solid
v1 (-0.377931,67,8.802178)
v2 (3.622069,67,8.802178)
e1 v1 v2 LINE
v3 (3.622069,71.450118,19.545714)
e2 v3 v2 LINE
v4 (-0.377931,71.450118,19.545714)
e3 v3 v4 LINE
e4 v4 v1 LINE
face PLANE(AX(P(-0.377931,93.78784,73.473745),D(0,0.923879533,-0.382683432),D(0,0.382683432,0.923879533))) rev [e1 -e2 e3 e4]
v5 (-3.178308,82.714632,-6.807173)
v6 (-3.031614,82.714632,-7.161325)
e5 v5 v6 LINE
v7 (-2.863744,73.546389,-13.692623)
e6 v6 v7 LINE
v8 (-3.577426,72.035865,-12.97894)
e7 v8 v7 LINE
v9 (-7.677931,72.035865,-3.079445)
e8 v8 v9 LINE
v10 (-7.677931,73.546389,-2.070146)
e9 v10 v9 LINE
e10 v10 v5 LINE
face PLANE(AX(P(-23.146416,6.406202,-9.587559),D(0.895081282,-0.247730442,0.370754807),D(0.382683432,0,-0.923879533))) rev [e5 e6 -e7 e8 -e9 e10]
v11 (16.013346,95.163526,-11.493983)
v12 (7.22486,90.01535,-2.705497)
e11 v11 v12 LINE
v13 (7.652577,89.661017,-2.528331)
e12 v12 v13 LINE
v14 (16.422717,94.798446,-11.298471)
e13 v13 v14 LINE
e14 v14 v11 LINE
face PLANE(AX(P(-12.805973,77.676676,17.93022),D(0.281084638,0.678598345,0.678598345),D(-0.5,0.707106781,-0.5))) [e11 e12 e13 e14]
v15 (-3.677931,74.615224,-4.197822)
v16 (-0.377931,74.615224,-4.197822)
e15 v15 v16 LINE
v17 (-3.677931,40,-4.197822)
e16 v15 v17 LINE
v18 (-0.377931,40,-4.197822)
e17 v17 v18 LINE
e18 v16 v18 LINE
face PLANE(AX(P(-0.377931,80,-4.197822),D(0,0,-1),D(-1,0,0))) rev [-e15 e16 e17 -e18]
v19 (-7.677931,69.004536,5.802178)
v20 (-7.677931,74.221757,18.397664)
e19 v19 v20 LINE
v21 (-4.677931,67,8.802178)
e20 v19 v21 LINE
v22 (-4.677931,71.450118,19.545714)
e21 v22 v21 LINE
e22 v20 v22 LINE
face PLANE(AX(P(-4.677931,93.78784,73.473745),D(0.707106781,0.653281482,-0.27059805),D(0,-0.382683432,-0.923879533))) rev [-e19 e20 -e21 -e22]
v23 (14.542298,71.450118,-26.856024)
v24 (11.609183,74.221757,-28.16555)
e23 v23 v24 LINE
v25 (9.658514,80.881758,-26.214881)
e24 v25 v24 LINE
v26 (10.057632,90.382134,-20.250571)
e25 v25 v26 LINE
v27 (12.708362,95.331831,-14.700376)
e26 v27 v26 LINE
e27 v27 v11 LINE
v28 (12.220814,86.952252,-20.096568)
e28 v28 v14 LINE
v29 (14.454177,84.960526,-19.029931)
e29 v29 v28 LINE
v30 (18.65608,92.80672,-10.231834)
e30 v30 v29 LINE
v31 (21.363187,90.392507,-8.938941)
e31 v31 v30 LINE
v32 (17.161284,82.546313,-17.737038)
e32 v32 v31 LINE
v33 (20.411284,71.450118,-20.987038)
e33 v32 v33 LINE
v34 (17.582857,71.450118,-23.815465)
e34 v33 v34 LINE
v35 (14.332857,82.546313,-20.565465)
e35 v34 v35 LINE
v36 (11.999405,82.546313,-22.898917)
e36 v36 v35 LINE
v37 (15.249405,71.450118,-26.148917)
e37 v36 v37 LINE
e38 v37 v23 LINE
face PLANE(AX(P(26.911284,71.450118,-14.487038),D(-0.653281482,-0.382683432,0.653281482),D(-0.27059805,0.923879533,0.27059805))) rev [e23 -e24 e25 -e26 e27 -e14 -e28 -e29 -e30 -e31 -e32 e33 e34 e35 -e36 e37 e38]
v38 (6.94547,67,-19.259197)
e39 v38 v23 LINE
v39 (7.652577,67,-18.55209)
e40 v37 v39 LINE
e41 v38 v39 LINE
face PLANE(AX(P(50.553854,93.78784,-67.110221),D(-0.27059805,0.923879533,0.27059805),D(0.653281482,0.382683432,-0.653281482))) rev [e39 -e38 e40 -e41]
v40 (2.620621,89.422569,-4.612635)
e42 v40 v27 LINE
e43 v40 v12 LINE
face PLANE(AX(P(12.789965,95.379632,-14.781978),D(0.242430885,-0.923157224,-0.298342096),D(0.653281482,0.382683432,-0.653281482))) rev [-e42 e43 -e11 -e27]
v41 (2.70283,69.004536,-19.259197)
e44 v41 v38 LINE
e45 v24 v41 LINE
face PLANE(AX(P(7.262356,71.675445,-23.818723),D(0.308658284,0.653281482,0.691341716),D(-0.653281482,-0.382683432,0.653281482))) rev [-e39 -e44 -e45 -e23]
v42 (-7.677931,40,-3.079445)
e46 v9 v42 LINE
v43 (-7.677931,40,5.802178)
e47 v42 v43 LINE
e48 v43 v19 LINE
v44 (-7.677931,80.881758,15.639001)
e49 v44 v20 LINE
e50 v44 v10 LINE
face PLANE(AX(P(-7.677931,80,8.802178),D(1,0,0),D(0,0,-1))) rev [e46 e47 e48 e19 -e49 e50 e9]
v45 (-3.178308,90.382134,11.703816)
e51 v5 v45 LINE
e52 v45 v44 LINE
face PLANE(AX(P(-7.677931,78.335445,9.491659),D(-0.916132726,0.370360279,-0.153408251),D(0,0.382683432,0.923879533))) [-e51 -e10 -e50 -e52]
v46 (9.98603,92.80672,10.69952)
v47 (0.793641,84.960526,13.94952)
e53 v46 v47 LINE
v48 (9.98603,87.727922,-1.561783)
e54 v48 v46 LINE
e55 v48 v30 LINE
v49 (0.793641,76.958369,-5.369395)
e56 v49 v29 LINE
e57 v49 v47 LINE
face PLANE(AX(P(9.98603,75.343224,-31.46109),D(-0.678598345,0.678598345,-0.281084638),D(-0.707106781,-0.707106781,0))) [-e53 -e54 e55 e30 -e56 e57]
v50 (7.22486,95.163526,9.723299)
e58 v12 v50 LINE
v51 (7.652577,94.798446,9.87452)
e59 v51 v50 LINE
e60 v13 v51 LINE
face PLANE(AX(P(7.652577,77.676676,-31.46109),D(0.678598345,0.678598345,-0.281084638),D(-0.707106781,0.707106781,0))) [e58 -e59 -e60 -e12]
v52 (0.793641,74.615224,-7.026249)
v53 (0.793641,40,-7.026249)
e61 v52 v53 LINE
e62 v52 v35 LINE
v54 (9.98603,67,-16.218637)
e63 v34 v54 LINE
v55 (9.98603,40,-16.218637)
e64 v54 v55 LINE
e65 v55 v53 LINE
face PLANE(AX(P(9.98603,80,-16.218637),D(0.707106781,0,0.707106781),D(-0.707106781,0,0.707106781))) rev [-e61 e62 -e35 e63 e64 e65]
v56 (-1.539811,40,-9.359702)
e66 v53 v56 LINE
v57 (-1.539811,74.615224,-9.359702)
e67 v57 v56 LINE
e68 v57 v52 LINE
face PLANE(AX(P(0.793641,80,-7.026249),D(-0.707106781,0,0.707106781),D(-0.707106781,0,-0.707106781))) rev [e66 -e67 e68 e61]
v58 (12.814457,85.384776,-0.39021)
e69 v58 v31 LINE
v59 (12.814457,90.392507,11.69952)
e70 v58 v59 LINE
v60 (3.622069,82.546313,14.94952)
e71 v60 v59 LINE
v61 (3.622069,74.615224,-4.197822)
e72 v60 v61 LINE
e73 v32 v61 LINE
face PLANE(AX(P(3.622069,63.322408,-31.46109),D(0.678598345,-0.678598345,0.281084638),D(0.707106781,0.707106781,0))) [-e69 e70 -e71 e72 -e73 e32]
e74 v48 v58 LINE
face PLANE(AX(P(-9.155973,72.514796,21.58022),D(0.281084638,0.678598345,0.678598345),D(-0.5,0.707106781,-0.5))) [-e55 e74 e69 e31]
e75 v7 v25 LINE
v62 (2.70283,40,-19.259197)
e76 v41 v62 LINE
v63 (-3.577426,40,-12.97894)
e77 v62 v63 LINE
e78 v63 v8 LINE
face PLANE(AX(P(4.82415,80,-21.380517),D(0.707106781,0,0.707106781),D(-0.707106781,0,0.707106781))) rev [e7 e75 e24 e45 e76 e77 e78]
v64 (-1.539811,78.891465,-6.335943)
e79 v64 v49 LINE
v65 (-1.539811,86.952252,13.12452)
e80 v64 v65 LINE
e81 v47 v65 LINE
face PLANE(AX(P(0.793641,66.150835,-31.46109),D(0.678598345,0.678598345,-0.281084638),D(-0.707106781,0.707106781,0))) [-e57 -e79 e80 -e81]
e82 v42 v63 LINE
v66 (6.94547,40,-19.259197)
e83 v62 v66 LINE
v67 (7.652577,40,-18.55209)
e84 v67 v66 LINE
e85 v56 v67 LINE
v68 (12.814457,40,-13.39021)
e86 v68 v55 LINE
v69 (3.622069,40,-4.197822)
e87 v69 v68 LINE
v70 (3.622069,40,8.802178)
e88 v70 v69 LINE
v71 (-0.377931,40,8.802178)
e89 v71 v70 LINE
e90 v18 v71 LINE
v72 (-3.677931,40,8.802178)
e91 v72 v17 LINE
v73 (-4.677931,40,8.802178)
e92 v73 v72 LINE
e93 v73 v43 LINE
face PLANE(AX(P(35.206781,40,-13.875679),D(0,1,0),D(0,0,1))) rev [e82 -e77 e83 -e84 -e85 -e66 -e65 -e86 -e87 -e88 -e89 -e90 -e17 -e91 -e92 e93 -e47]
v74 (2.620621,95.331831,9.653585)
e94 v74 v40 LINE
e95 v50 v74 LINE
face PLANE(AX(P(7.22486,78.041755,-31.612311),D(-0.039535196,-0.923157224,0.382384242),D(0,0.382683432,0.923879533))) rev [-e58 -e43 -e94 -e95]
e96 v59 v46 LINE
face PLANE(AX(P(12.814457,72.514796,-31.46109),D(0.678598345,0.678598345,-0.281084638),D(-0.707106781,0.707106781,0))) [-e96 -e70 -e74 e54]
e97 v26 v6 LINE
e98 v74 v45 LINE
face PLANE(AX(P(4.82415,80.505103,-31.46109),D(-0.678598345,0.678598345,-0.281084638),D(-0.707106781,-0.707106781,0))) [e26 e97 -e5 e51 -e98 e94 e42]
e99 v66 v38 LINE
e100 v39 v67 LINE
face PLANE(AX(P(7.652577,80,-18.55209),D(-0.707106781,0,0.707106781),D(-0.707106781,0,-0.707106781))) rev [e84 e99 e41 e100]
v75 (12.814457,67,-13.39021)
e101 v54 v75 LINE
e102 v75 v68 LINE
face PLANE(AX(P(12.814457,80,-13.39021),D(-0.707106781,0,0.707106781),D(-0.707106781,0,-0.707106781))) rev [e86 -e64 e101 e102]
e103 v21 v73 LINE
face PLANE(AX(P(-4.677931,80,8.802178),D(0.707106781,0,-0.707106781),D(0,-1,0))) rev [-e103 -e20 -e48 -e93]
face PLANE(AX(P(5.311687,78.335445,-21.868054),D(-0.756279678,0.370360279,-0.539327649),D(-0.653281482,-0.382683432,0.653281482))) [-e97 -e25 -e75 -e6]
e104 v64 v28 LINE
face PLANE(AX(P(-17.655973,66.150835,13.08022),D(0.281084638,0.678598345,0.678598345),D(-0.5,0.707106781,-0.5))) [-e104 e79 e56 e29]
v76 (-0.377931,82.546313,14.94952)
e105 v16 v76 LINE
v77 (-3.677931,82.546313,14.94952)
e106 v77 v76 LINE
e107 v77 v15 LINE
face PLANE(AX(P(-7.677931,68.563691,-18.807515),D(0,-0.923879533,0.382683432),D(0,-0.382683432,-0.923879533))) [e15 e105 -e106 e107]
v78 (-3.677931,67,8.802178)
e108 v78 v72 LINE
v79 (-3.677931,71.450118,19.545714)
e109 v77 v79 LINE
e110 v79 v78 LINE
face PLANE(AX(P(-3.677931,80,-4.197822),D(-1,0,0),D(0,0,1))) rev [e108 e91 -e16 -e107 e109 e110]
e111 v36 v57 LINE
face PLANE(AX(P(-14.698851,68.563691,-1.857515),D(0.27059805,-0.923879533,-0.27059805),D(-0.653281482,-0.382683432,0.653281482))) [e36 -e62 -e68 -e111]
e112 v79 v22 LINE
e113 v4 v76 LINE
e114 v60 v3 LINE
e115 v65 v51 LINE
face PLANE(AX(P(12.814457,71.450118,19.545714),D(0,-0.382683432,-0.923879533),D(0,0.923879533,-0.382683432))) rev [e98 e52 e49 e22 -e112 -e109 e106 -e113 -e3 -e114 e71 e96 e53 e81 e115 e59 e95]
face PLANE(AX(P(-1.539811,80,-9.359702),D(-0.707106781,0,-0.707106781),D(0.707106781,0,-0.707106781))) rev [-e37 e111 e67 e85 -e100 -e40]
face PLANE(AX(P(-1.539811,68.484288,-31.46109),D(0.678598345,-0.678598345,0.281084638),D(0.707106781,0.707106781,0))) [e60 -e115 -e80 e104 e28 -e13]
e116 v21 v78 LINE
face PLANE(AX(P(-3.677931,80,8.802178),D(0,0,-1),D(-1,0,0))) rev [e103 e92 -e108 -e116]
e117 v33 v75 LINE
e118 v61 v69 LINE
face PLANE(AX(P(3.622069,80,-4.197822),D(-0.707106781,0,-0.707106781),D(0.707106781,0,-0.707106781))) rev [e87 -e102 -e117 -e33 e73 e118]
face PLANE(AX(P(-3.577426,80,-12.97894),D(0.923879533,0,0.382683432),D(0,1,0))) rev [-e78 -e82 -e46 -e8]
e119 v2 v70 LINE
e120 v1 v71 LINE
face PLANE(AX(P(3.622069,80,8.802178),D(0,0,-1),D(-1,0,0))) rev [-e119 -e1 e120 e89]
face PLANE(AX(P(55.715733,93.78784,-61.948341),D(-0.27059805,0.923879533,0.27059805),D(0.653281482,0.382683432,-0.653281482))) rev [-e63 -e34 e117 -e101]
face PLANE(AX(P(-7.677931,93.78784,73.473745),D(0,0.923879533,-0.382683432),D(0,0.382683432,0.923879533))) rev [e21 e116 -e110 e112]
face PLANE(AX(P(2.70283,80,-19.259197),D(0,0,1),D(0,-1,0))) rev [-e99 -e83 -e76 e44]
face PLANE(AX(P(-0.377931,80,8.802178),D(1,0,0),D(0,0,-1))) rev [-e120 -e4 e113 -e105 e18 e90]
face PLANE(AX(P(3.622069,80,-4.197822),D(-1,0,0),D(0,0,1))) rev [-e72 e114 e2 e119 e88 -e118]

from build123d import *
from OCP.BRepFilletAPI import BRepFilletAPI_MakeChamfer

# Parameters (mm, degrees)
BOSS_EXTRUDE1_DEPTH = 80
CUT_EXTRUDE2_DEPTH  = 82.280481137
SKETCH6_W           = 4
SKETCH6_H           = 13
BOSS_EXTRUDE6_DEPTH = 70
BOSS_EXTRUDE7_REACH = 148.366
BOSS_EXTRUDE8_REACH = 152.403
CUT_EXTRUDE3_DEPTH  = 146.557626962
CUT_EXTRUDE4_DEPTH  = 142.8119282
CHAMFER3_START      = -30
CHAMFER3_OUTLINE_W  = 24
CHAMFER3_OUTLINE_H  = 27
CHAMFER3_DEPTH      = 4.140431355
CHAMFER4_START      = -11
CHAMFER4_OUTLINE_W  = 75
CHAMFER4_OUTLINE_H  = 14
CHAMFER4_DEPTH      = 2.728063486
CHAMFER5_START      = -38
CHAMFER5_OUTLINE_W  = 21
CHAMFER5_OUTLINE_H  = 26
CHAMFER5_DEPTH      = 3.409757195
CHAMFER7_SIZE       = 3
CHAMFER7_SIZE2      = 3.268453219
CHAMFER8_START      = -40
CHAMFER8_DEPTH      = 3.210737533
SKETCH20_W          = 40
SKETCH20_H          = 40
CUT_EXTRUDE5_DEPTH  = 103.734976835


with BuildPart() as part:
    # Sketch1 → Boss-Extrude1 (new body)
    with BuildSketch(Plane(origin=(0, 0, 0), x_dir=(1, 0, 0), z_dir=(0, 1, 0))):
        Polygon((3.622068507, 4.197822071), (3.622068507, -8.802177929), (-0.377931493, -8.802177929), (-0.377931493, 4.197822071), (-3.677931493, 4.197822071), (-3.677931493, -8.802177929), (-7.677931493, -8.802177929), (-7.677931493, 8.878435326), align=None)
    extrude(amount=BOSS_EXTRUDE1_DEPTH)

    # Sketch2 → Cut-Extrude2 (cut, through all)
    with BuildSketch(Plane.ZY.offset(7.677931493)):
        Polygon((8.802177929, 80), (-8.878435326, 80), (-8.878435326, 72.676450199), align=None)
    extrude(amount=-CUT_EXTRUDE2_DEPTH, mode=Mode.SUBTRACT)

    # Sketch6 → Boss-Extrude6 (add, along a direction that is not the sketch's normal)
    with BuildSketch(Plane.XY.offset(8.802177929)):
        with Locations((-5.677931493, 73.5)):
            Rectangle(SKETCH6_W, SKETCH6_H)
        with Locations((1.622068507, 73.5)):
            Rectangle(SKETCH6_W, SKETCH6_H)
    extrude(amount=BOSS_EXTRUDE6_DEPTH, dir=(0, 0.3826834323650841, 0.9238795325112892))

    # Boss-Extrude7: up to this plane
    boss_extrude7_end = Plane(origin=(3.622068507, 80, -4.197822071), z_dir=(-0.3826834323650841, 0, 0.9238795325112892))
    # Sketch7 → Boss-Extrude7 (add, up to the surface)
    with BuildSketch(Plane.XY.offset(73.473745205), mode=Mode.PRIVATE) as boss_extrude7_sk1:
        Polygon((-7.677931493, 106.787840266), (3.622068507, 106.787840266), (-7.677931493, 111.46845352), align=None)
    boss_extrude7_tool1 = split(extrude(boss_extrude7_sk1.sketch, amount=BOSS_EXTRUDE7_REACH, dir=(0, -0.382683432365, -0.923879532511), mode=Mode.PRIVATE), bisect_by=boss_extrude7_end, keep=Keep.BOTH, mode=Mode.PRIVATE)
    add(boss_extrude7_tool1.solids().sort_by_distance((-3.911265, 108.348045, 73.473745))[0])

    # Boss-Extrude8: up to this plane
    boss_extrude8_end = Plane(origin=(3.622068507, 80, -4.197822071), z_dir=(-0.3826834323650841, 0, 0.9238795325112892))
    # Sketch16 → Boss-Extrude8 (add, up to the surface)
    with BuildSketch(Plane.XY.offset(73.473745205), mode=Mode.PRIVATE) as boss_extrude8_sk1:
        Polygon((3.622068507, 106.787840266), (12.814456663, 115.980228421), (9.986029538, 118.808655546), (0.793641383, 109.61626739), (-1.539810995, 111.949719768), (7.65257716, 121.142107924), (4.824150035, 123.970535048), (-7.677931493, 111.46845352), align=None)
    boss_extrude8_tool1 = split(extrude(boss_extrude8_sk1.sketch, amount=BOSS_EXTRUDE8_REACH, dir=(0, -0.382683432365, -0.923879532511), mode=Mode.PRIVATE), bisect_by=boss_extrude8_end, keep=Keep.BOTH, mode=Mode.PRIVATE)
    add(boss_extrude8_tool1.solids().sort_by_distance((8.029162, 111.573135, 73.473745))[0])

    # Sketch17 → Cut-Extrude3 (cut, through all)
    with BuildSketch(Plane.ZY.offset(7.677931493)):
        Polygon((73.473745205, 93.787840266), (58.313175353, 130.388693616), (73.473745205, 136.668407262), align=None)
    extrude(amount=-CUT_EXTRUDE3_DEPTH, mode=Mode.SUBTRACT)

    # Sketch19 → Cut-Extrude4 (cut, through all)
    with BuildSketch(Plane.ZY.offset(7.677931493)):
        Polygon((73.473745205, 93.787840266), (19.545714219, 71.450118439), (5.092625448, 106.342961367), (59.020656435, 128.680683193), align=None)
    extrude(amount=-CUT_EXTRUDE4_DEPTH, mode=Mode.SUBTRACT)

    # Mirror9: part across plane


with BuildPart() as part_1:
    add(part.part)
    add(part.part.mirror(Plane(origin=(2.014593878, 0, -4.863659863), x_dir=(0.9238795325112891, 0, 0.3826834323650842), z_dir=(0.3826834323650841, 0, -0.9238795325112892))))

    # Chamfer3: read off the stored shape, not the designer's step
    # Chamfer3 outline → Chamfer3 (cut)
    with BuildSketch(Plane(origin=(0, 0, 0), x_dir=(0.4459030144065531, 0.4972805165228299, -0.7442328866893325), z_dir=(0.8950812821990801, -0.24773044161799307, 0.3707548065131521)).offset(CHAMFER3_START)):
        with Locations((45, 59.5)):
            Rectangle(CHAMFER3_OUTLINE_W, CHAMFER3_OUTLINE_H)
    extrude(amount=CHAMFER3_DEPTH, mode=Mode.SUBTRACT)

    # Chamfer4: read off the stored shape, not the designer's step
    # Chamfer4 outline → Chamfer4 (cut)
    with BuildSketch(Plane(origin=(0, 0, 0), x_dir=(0, 1, 0), z_dir=(0.9238795325112892, 0, 0.3826834323650841)).offset(CHAMFER4_START)):
        with Locations((36.5, -5)):
            Rectangle(CHAMFER4_OUTLINE_W, CHAMFER4_OUTLINE_H)
    extrude(amount=CHAMFER4_DEPTH, mode=Mode.SUBTRACT)

    # Chamfer5: read off the stored shape, not the designer's step
    # Chamfer5 outline → Chamfer5 (cut)
    with BuildSketch(Plane(origin=(0, 0, 0), x_dir=(0.3652745046018862, 0.9288881868246626, 0.061165943673236425), z_dir=(0.9161327263409628, -0.37036027915745895, 0.15340825059130198)).offset(CHAMFER5_START)):
        with Locations((74.5, 5)):
            Rectangle(CHAMFER5_OUTLINE_W, CHAMFER5_OUTLINE_H)
    extrude(amount=CHAMFER5_DEPTH, mode=Mode.SUBTRACT)

    # Chamfer7: one chamfer whose edges measure the first distance from different faces: ONE call of the kernel's chamfer builder (chamfer() names one face for all edges)
    chamfer7_edges_1 = [part_1.edges().sort_by_distance(p)[0] for p in [
        (-7.677931493, 69.225059219, 14.173946074),
        (8.622563718, 69.225059219, -25.178930536),
        (4.824150035, 33.5, -21.380516854),
        (-7.677931493, 33.5, 8.802177929),
    ]]
    chamfer7_edges_2 = [part_1.edges().sort_by_distance(p)[0] for p in [
        (9.269880183, 94.608411482, -8.145633747),
        (4.824150035, 94.608411482, 2.587308271),
    ]]
    chamfer7_side_2 = [part_1.faces().sort_by_distance(p)[0] for p in [
        (3.501171082, 89.374799079, -6.853796043),
    ]]
    chamfer7 = BRepFilletAPI_MakeChamfer(part_1.part.solid().wrapped)
    for e in chamfer7_edges_1:
        chamfer7.Add(CHAMFER7_SIZE, e.wrapped)
    for e in chamfer7_edges_2:
        chamfer7.Add(CHAMFER7_SIZE, CHAMFER7_SIZE2, e.wrapped, chamfer7_side_2[0].wrapped)  # the first distance lies on this face
    add(Compound.cast(chamfer7.Shape()), mode=Mode.REPLACE)

    # Chamfer8: read off the stored shape, not the designer's step
    # Chamfer8 outline → Chamfer8 (cut)
    with BuildSketch(Plane(origin=(0, 0, 0), x_dir=(0.6542484614665716, 0.42811862617005, -0.6234367590982206), z_dir=(0.7562796775456972, -0.37036027915745917, 0.5393276489795283)).offset(CHAMFER8_START)):
        Polygon((57.189510074, 50), (58.060381385, 66), (36, 66), (36, 50), align=None)
    extrude(amount=CHAMFER8_DEPTH, mode=Mode.SUBTRACT)

    # Sketch20 → Cut-Extrude5 (cut, through all)
    with BuildSketch(Plane(origin=(-7.642272839, 0, -3.165533057), x_dir=(-0.3826834323650836, 0, 0.9238795325112894), z_dir=(-0.9238795325112893, 0, -0.38268343236508356))):
        with Locations((-6.292508137, 20)):
            Rectangle(SKETCH20_W, SKETCH20_H)
    extrude(amount=-CUT_EXTRUDE5_DEPTH, mode=Mode.SUBTRACT)


solid = part_1.part
